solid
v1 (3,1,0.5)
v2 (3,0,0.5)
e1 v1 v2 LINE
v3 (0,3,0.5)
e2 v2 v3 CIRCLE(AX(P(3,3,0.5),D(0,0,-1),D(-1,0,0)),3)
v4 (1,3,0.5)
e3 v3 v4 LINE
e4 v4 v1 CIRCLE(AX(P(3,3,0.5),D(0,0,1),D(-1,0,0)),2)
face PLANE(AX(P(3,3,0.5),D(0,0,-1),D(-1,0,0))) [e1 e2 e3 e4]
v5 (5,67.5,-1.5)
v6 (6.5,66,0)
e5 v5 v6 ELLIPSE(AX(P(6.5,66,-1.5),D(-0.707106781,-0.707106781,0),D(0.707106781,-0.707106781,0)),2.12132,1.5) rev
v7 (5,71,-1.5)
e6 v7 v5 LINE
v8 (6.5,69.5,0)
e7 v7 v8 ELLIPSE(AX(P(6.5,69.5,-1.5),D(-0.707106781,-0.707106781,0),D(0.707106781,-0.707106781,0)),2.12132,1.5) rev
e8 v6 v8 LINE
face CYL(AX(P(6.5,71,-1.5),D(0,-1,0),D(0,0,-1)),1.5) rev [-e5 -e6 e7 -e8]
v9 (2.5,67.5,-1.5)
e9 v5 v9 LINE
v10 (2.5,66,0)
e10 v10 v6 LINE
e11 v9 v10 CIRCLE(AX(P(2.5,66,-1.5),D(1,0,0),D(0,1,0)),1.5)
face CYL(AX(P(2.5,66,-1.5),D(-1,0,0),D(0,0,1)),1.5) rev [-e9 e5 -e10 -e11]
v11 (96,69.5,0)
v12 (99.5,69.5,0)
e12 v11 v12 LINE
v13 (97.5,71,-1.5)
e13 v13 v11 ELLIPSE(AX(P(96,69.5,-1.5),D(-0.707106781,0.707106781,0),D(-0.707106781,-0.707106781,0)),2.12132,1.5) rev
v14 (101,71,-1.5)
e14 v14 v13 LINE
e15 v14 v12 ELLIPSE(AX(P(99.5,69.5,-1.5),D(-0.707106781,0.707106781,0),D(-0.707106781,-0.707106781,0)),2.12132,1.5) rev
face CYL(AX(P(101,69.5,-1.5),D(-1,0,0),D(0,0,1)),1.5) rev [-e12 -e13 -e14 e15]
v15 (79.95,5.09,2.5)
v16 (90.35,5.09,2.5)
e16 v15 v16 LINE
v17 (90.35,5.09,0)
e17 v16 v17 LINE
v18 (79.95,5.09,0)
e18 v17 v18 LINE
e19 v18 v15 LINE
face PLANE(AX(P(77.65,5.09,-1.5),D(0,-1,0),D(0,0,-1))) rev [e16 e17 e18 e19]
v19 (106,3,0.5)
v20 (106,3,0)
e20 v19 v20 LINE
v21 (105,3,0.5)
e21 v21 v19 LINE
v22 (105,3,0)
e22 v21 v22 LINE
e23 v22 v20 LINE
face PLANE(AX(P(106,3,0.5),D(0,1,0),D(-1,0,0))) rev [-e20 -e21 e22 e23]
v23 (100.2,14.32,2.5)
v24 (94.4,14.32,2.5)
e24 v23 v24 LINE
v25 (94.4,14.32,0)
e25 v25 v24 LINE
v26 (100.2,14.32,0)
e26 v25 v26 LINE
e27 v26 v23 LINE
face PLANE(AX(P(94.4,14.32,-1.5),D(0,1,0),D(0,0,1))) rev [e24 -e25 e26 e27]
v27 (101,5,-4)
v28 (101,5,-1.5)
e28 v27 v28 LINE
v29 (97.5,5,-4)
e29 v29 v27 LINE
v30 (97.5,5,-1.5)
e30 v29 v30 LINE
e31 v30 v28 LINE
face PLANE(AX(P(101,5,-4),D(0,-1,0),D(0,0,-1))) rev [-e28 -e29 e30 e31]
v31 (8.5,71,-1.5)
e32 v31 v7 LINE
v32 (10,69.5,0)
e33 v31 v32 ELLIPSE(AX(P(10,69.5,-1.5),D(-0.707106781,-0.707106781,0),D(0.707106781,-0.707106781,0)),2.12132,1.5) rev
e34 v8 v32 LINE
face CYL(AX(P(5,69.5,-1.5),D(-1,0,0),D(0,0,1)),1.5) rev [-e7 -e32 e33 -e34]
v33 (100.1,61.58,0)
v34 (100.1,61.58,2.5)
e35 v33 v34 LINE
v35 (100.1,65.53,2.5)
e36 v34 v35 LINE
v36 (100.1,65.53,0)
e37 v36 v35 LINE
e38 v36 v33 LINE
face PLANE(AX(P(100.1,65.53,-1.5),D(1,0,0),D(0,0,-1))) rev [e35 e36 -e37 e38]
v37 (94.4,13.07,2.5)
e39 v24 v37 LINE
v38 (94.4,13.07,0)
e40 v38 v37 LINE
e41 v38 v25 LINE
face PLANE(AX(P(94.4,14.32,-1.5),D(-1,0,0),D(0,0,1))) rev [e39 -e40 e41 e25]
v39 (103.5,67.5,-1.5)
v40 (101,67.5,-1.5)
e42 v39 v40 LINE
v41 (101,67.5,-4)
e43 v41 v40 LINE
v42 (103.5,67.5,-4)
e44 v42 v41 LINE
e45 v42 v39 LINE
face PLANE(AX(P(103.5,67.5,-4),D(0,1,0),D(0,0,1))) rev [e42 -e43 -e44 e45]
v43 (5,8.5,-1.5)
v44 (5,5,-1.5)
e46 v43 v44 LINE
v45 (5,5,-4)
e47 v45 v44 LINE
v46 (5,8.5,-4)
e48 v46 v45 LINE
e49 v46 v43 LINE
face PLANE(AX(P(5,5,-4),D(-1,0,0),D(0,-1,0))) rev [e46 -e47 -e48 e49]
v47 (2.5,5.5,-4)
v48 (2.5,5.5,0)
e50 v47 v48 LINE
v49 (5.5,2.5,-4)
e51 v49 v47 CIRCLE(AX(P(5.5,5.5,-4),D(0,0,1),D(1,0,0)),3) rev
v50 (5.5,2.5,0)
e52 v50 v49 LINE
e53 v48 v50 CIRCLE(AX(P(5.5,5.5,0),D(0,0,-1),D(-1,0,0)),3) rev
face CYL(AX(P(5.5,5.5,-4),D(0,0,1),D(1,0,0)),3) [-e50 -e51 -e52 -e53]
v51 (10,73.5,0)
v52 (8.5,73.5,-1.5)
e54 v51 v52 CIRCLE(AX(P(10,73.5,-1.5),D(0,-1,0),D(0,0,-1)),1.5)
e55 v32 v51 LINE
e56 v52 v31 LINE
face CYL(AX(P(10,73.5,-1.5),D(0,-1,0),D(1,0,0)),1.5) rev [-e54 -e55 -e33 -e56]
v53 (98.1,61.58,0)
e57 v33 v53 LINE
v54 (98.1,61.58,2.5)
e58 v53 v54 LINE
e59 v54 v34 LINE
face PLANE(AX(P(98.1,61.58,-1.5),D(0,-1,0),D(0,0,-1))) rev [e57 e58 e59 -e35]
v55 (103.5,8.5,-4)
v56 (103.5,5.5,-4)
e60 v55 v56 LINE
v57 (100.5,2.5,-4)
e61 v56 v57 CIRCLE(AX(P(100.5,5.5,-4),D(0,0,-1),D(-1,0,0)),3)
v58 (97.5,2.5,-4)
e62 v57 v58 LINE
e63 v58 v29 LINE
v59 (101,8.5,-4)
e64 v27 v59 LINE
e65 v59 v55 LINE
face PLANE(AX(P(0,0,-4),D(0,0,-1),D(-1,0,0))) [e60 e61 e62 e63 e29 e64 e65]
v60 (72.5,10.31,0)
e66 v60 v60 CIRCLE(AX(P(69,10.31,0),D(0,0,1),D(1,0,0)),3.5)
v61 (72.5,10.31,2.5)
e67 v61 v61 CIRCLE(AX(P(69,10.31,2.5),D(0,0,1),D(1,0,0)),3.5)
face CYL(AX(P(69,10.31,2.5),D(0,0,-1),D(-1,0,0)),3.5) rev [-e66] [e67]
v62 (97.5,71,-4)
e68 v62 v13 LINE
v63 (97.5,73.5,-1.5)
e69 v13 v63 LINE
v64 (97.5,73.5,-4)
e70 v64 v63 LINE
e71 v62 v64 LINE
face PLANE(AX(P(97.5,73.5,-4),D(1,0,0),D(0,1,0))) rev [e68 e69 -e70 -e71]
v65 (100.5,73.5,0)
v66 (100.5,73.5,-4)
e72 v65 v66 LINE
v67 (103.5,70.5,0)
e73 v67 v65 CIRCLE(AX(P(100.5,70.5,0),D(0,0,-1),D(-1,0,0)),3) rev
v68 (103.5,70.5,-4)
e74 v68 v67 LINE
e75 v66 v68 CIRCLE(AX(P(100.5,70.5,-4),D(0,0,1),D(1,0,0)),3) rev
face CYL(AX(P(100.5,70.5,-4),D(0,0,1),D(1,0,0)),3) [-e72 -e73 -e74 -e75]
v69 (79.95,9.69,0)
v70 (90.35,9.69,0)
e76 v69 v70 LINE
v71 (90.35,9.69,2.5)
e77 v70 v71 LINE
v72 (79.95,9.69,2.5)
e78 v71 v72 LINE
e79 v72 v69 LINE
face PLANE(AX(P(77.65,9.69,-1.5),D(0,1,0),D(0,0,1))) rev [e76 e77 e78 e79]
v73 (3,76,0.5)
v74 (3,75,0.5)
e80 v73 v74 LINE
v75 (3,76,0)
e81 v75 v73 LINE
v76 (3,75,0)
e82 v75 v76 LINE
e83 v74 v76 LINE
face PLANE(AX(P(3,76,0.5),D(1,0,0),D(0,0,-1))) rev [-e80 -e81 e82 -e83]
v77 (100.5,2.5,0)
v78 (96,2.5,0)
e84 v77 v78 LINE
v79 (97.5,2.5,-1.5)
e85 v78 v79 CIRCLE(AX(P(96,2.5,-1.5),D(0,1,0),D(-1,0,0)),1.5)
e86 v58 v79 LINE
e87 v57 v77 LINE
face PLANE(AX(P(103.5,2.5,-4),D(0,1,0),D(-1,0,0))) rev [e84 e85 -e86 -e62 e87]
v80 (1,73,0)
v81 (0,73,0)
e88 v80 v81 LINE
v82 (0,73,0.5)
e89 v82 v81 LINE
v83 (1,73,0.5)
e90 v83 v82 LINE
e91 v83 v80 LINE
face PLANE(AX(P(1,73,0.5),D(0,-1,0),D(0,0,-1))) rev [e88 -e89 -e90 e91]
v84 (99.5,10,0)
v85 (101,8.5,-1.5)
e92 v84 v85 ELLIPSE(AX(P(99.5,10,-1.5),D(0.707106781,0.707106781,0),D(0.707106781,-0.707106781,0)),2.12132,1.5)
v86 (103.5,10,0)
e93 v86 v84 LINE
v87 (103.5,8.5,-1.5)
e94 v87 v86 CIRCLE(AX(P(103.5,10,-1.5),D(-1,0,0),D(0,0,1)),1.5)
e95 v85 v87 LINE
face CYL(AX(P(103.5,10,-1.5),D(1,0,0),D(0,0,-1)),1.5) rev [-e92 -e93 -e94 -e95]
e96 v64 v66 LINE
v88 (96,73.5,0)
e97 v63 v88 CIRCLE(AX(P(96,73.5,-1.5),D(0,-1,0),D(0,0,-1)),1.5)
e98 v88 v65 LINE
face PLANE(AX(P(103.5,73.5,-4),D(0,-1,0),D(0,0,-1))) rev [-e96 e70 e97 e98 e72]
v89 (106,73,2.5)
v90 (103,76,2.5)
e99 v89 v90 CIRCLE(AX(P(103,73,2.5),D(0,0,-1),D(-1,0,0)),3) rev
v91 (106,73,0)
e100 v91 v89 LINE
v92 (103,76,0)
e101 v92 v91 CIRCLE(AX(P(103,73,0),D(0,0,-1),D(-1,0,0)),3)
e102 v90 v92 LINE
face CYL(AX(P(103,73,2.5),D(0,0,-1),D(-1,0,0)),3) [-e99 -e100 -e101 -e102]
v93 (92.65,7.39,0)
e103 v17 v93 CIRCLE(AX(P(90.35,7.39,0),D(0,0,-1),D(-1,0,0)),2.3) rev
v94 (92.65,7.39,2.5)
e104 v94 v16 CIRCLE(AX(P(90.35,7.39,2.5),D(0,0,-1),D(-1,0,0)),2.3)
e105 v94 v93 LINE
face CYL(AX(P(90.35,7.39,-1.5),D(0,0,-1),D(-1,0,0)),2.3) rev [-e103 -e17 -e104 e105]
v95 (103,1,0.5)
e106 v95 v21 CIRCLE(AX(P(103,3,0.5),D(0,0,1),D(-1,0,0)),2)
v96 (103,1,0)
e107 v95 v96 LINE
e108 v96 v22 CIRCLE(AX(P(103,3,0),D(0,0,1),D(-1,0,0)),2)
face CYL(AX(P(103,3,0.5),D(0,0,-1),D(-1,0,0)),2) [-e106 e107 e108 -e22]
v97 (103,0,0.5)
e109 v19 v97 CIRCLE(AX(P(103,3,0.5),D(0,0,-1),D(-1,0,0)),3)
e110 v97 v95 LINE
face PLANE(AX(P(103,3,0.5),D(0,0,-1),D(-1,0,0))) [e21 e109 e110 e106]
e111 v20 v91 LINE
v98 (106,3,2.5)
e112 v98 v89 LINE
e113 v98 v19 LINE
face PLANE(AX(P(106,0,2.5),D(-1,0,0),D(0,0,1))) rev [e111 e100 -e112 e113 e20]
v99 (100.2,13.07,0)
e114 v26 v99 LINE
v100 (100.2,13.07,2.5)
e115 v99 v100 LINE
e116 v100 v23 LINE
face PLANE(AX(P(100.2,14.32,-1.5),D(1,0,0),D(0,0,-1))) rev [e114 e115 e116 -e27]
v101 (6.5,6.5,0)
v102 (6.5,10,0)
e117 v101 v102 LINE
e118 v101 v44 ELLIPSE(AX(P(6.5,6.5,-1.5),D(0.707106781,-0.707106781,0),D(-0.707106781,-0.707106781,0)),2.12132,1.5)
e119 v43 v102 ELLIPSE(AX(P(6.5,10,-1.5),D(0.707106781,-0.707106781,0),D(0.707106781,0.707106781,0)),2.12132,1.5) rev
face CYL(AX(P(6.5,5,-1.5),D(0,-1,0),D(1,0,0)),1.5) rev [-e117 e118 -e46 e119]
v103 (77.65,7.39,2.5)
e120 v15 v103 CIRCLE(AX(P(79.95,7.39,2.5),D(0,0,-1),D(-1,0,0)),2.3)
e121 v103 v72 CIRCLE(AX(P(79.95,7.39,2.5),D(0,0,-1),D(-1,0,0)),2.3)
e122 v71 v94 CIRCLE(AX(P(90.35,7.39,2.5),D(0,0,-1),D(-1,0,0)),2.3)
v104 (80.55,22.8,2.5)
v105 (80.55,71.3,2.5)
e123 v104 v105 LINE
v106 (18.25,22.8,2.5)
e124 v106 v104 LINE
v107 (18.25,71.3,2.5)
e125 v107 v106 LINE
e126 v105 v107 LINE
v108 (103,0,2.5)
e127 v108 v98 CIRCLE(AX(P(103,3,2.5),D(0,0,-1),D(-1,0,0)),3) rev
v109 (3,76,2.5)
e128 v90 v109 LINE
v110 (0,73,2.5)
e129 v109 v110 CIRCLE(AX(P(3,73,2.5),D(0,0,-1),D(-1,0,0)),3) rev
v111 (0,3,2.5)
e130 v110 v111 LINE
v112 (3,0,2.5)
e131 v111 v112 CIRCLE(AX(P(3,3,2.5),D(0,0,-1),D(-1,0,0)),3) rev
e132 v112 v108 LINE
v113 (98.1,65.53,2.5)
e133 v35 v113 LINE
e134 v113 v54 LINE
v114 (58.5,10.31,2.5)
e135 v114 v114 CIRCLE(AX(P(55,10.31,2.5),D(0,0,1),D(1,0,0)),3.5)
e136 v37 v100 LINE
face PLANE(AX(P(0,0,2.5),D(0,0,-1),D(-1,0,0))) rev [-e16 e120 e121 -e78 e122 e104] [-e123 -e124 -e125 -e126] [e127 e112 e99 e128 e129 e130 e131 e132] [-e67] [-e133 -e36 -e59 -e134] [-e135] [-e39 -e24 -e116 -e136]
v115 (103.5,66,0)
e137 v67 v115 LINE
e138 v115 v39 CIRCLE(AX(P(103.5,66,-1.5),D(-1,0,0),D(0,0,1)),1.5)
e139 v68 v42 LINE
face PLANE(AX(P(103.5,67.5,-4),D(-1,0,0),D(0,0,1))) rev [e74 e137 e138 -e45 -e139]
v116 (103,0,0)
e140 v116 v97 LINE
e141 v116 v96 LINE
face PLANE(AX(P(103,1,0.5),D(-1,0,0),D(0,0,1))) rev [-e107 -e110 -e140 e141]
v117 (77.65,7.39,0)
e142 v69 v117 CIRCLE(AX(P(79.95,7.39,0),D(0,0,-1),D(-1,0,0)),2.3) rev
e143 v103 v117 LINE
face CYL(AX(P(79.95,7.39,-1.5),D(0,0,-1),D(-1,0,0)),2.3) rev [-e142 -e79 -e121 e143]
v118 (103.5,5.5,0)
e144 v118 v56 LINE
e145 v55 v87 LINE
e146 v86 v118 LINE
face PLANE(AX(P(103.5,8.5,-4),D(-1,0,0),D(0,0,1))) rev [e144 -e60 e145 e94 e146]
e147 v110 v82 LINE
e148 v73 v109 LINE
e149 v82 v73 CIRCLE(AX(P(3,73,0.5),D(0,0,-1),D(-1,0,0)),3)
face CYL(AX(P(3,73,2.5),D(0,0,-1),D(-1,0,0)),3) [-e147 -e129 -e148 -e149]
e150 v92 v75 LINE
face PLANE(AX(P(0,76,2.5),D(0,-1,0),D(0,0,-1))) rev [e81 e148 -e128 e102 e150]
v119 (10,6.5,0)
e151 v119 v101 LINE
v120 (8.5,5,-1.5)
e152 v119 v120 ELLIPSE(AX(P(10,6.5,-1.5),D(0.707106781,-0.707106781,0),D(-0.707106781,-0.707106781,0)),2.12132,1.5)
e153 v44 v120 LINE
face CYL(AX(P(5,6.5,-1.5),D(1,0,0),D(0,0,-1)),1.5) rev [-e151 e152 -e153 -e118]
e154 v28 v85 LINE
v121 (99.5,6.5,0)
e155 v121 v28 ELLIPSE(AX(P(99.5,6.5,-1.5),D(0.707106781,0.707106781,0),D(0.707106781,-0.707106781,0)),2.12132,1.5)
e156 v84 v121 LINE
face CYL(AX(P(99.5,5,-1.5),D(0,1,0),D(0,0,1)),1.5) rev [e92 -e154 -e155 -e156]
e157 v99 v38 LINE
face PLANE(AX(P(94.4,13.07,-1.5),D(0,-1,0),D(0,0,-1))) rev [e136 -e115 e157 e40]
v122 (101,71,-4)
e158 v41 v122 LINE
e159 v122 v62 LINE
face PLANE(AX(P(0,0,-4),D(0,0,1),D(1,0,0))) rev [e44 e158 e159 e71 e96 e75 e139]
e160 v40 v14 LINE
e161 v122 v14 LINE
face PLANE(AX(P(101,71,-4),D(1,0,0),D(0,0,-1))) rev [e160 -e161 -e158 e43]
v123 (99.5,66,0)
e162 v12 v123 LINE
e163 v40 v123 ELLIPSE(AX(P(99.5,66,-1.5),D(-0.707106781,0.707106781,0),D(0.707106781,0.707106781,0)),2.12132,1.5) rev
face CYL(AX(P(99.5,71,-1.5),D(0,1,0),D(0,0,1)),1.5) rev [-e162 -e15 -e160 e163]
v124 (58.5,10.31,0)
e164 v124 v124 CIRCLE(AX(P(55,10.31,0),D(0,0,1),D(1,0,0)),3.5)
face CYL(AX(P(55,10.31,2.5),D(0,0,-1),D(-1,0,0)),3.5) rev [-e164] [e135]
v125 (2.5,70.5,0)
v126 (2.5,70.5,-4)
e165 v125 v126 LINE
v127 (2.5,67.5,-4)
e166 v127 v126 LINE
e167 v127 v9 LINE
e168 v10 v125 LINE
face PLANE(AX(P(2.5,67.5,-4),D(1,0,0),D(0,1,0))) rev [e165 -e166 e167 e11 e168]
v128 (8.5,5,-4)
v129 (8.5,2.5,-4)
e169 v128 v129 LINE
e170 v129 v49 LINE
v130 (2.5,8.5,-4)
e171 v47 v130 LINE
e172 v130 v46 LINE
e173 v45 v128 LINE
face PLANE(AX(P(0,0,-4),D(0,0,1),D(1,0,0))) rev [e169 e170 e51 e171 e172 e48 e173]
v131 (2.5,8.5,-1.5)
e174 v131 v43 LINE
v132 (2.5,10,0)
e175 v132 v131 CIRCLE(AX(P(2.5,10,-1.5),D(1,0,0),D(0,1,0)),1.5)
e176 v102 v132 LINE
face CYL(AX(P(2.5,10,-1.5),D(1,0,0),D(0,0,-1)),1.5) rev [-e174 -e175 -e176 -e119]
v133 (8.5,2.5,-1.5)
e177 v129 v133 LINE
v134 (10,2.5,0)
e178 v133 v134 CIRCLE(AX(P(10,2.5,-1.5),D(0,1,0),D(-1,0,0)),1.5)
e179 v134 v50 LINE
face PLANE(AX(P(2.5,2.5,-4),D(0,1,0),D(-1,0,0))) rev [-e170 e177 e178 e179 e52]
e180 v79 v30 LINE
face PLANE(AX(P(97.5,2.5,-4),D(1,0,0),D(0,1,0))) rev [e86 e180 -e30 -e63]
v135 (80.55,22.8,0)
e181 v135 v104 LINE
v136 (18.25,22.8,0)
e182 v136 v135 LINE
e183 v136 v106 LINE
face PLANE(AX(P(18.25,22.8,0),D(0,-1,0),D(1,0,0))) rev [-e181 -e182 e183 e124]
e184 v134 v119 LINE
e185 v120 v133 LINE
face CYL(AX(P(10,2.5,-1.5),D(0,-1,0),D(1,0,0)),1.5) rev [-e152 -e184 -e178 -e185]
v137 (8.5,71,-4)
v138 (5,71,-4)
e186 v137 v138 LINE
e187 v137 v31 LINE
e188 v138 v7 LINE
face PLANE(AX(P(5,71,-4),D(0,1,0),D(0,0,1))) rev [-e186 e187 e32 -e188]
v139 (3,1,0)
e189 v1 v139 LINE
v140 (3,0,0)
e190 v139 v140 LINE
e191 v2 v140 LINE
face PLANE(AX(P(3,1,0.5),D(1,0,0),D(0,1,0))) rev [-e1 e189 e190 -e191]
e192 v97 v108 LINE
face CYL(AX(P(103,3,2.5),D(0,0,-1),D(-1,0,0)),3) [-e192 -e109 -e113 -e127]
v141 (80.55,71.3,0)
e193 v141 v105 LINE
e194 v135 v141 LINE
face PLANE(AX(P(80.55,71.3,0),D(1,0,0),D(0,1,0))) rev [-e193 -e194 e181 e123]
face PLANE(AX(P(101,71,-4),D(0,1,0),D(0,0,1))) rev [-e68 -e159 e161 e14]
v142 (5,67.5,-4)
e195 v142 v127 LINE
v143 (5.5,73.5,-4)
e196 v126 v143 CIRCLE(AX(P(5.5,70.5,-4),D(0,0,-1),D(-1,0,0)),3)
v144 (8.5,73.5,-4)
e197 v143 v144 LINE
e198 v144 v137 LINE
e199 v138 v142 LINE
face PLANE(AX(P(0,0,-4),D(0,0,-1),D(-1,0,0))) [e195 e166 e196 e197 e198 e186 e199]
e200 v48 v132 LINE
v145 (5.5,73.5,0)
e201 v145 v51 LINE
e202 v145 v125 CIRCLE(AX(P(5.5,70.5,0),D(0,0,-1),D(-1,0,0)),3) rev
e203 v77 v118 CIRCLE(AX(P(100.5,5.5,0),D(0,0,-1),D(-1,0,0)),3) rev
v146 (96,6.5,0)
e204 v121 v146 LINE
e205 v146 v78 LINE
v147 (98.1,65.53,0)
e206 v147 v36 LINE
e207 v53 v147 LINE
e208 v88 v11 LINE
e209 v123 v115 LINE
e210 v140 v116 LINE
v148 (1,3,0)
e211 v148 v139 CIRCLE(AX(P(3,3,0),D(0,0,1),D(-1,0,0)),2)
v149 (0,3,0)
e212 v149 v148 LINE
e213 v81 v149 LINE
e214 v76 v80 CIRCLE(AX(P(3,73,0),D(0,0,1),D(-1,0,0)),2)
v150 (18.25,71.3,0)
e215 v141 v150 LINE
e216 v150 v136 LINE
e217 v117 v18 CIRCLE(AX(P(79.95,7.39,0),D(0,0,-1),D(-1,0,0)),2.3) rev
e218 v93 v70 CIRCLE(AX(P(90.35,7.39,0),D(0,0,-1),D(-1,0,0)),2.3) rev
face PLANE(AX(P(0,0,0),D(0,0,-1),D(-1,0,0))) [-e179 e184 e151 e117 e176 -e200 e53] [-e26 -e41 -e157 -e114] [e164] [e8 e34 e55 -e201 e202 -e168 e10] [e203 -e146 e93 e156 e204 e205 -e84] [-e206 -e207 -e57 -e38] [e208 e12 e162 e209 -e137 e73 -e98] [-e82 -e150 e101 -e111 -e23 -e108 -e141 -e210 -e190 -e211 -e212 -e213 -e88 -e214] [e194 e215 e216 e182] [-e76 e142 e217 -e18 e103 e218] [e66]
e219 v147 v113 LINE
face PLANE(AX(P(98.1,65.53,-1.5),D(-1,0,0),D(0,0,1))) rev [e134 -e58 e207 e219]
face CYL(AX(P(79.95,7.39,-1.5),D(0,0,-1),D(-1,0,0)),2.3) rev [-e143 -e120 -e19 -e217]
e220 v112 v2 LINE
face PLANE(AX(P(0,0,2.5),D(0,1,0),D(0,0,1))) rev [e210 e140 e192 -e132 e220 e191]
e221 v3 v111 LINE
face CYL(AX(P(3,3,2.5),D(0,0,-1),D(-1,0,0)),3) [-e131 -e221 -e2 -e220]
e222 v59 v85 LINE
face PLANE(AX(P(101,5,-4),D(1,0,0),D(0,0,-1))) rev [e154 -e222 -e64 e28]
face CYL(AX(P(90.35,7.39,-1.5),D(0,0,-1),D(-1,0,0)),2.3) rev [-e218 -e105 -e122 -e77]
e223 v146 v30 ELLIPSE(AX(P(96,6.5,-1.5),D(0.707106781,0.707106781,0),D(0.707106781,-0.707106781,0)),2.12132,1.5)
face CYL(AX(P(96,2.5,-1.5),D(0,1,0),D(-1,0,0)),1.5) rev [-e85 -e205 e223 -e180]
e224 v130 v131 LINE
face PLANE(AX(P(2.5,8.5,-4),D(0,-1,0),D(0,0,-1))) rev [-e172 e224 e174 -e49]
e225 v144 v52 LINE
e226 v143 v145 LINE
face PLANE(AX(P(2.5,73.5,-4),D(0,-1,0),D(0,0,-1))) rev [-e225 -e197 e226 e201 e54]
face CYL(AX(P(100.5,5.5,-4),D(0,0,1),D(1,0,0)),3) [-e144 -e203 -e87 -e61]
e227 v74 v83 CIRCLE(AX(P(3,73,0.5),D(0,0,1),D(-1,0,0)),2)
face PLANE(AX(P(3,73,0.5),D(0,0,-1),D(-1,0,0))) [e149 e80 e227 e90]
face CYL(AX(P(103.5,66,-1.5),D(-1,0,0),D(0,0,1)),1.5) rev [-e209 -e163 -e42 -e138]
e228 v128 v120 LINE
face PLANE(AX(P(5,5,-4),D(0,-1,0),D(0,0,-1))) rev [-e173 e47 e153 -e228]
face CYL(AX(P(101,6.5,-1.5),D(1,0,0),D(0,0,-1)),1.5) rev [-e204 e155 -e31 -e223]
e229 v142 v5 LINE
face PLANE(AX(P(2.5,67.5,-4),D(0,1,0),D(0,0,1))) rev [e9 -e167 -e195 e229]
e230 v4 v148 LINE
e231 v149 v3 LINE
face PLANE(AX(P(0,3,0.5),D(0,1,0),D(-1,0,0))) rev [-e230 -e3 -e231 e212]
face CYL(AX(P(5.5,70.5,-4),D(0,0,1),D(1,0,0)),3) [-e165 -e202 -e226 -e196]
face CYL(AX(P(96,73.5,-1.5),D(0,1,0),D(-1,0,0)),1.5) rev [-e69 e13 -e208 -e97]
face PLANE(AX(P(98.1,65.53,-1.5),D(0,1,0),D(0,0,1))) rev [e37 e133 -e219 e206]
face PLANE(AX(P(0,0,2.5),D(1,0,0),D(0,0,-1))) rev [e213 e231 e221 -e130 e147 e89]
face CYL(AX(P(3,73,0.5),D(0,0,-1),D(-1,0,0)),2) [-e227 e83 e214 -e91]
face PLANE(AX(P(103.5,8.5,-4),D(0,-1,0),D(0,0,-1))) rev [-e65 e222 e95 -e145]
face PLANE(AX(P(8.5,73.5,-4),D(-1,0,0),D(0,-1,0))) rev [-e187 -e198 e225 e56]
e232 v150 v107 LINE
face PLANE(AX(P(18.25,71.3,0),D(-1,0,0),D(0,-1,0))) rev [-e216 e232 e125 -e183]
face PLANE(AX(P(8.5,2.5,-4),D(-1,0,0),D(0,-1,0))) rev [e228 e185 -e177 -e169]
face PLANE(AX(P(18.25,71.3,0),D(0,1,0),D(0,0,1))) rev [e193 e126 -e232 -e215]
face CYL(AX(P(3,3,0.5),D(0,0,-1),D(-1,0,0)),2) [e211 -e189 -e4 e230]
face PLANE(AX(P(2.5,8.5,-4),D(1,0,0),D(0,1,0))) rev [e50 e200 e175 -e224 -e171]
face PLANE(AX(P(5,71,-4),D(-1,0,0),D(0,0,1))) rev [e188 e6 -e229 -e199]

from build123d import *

# Parameters (mm, degrees)
IZIM1_W                     = 106
IZIM1_H                     = 76
IZIM1_R                     = 3.5
Y_KSEKLIK_EKSTR_ZYON2_DEPTH = 2.5
IZIM5_W                     = 62.3
IZIM5_H                     = 48.5
KES_EKSTR_ZYON1_DEPTH       = 2.5
Y_KSEKLIK_EKSTR_ZYON6_DEPTH = 4
RADYUS7_R                   = 3
RADYUS15_R                  = 3
IZIM12_W                    = 15
IZIM12_H                    = 4.6
IZIM12_W_2                  = 5.8
IZIM12_H_2                  = 1.25
IZIM12_W_3                  = 2
IZIM12_H_3                  = 3.95
KES_EKSTR_ZYON3_DEPTH       = 4
RADYUS16_R                  = 2.3
KES_EKSTR_ZYON5_START       = -0.5
KES_EKSTR_ZYON5_DEPTH       = 0.5
RADYUS17_R                  = 1.5


with BuildPart() as part:
    # Çizim1 → Yükseklik-Ekstrüzyon2 (new body)
    with BuildSketch(Plane.XY):
        with Locations((53, 38)):
            Rectangle(IZIM1_W, IZIM1_H)
        with Locations((55, 10.31)):
            Circle(IZIM1_R, mode=Mode.SUBTRACT)
        with Locations((69, 10.31)):
            Circle(IZIM1_R, mode=Mode.SUBTRACT)
    extrude(amount=Y_KSEKLIK_EKSTR_ZYON2_DEPTH)

    # Çizim5 → Kes-Ekstrüzyon1 (cut)
    with BuildSketch(Plane.XY.offset(2.5)):
        with Locations((49.4, 47.05)):
            Rectangle(IZIM5_W, IZIM5_H)
    extrude(amount=-KES_EKSTR_ZYON1_DEPTH, mode=Mode.SUBTRACT)

    # Çizim7 → Yükseklik-Ekstrüzyon6 (add)
    with BuildSketch(Plane(origin=(0, 0, 0), x_dir=(-1, 0, 0), z_dir=(0, 0, -1))):
        Polygon((-103.5, 73.5), (-97.5, 73.5), (-97.5, 71), (-101, 71), (-101, 67.5), (-103.5, 67.5), align=None)
        Polygon((-2.5, 2.5), (-8.5, 2.5), (-8.5, 5), (-5, 5), (-5, 8.5), (-2.5, 8.5), align=None)
        Polygon((-2.5, 67.5), (-2.5, 73.5), (-8.5, 73.5), (-8.5, 71), (-5, 71), (-5, 67.5), align=None)
        Polygon((-103.5, 8.5), (-103.5, 2.5), (-97.5, 2.5), (-97.5, 5), (-101, 5), (-101, 8.5), align=None)
    extrude(amount=Y_KSEKLIK_EKSTR_ZYON6_DEPTH)

    # Radyus7
    radyus7_edges = [part.edges().sort_by_distance(p)[0] for p in [
        (2.5, 2.5, -2),
        (2.5, 73.5, -2),
        (103.5, 2.5, -2),
        (103.5, 73.5, -2),
    ]]
    fillet(radyus7_edges, radius=RADYUS7_R)

    # Radyus15
    radyus15_edges = [part.edges().sort_by_distance(p)[0] for p in [
        (0, 76, 1.25),
        (106, 76, 1.25),
        (106, 0, 1.25),
        (0, 0, 1.25),
    ]]
    fillet(radyus15_edges, radius=RADYUS15_R)

    # Çizim12 → Kes-Ekstrüzyon3 (cut)
    with BuildSketch(Plane.XY.offset(2.5)):
        with Locations((85.15, 7.39)):
            Rectangle(IZIM12_W, IZIM12_H)
        with Locations((97.3, 13.695)):
            Rectangle(IZIM12_W_2, IZIM12_H_2)
        with Locations((99.1, 63.555)):
            Rectangle(IZIM12_W_3, IZIM12_H_3)
    extrude(amount=-KES_EKSTR_ZYON3_DEPTH, mode=Mode.SUBTRACT)

    # Radyus16
    radyus16_edges = [part.edges().sort_by_distance(p)[0] for p in [
        (92.65, 5.09, 1.25),
        (92.65, 9.69, 1.25),
        (77.65, 9.69, 1.25),
        (77.65, 5.09, 1.25),
    ]]
    fillet(radyus16_edges, radius=RADYUS16_R - 0.0001)  # a hair under: the kernel refuses the full size

    # Çizim14 → Kes-Ekstrüzyon5 (cut)
    with BuildSketch(Plane(origin=(0, 0, 0), x_dir=(-1, 0, 0), z_dir=(0, 0, -1)).offset(KES_EKSTR_ZYON5_START)):
        with BuildLine():
            Line((-106, 3), (-105, 3))
            ThreePointArc((-105, 3), (-104.414213562, 1.585786438), (-103, 1))
            Line((-103, 1), (-103, 0))
            ThreePointArc((-103, 0), (-105.121320344, 0.878679656), (-106, 3))
        make_face()
        with BuildLine():
            Line((-3, 1), (-3, 0))
            ThreePointArc((-3, 0), (-0.878679656, 0.878679656), (0, 3))
            Line((0, 3), (-1, 3))
            ThreePointArc((-1, 3), (-1.585786438, 1.585786438), (-3, 1))
        make_face()
        with BuildLine():
            Line((-3, 76), (-3, 75))
            ThreePointArc((-3, 75), (-1.585786438, 74.414213562), (-1, 73))
            Line((-1, 73), (0, 73))
            ThreePointArc((0, 73), (-0.878679656, 75.121320344), (-3, 76))
        make_face()
    extrude(amount=KES_EKSTR_ZYON5_DEPTH, mode=Mode.SUBTRACT)

    # Radyus17
    radyus17_edges = [part.edges().sort_by_distance(p)[0] for p in [
        (3.75, 8.5, 0),
        (5, 6.75, 0),
        (6.75, 5, 0),
        (8.5, 3.75, 0),
        (3.75, 67.5, 0),
        (8.5, 72.25, 0),
        (6.75, 71, 0),
        (5, 69.25, 0),
        (102.25, 8.5, 0),
        (97.5, 3.75, 0),
        (99.25, 5, 0),
        (101, 6.75, 0),
        (102.25, 67.5, 0),
        (101, 69.25, 0),
        (99.25, 71, 0),
        (97.5, 72.25, 0),
    ]]
    fillet(radyus17_edges, radius=RADYUS17_R)


solid = part.part
